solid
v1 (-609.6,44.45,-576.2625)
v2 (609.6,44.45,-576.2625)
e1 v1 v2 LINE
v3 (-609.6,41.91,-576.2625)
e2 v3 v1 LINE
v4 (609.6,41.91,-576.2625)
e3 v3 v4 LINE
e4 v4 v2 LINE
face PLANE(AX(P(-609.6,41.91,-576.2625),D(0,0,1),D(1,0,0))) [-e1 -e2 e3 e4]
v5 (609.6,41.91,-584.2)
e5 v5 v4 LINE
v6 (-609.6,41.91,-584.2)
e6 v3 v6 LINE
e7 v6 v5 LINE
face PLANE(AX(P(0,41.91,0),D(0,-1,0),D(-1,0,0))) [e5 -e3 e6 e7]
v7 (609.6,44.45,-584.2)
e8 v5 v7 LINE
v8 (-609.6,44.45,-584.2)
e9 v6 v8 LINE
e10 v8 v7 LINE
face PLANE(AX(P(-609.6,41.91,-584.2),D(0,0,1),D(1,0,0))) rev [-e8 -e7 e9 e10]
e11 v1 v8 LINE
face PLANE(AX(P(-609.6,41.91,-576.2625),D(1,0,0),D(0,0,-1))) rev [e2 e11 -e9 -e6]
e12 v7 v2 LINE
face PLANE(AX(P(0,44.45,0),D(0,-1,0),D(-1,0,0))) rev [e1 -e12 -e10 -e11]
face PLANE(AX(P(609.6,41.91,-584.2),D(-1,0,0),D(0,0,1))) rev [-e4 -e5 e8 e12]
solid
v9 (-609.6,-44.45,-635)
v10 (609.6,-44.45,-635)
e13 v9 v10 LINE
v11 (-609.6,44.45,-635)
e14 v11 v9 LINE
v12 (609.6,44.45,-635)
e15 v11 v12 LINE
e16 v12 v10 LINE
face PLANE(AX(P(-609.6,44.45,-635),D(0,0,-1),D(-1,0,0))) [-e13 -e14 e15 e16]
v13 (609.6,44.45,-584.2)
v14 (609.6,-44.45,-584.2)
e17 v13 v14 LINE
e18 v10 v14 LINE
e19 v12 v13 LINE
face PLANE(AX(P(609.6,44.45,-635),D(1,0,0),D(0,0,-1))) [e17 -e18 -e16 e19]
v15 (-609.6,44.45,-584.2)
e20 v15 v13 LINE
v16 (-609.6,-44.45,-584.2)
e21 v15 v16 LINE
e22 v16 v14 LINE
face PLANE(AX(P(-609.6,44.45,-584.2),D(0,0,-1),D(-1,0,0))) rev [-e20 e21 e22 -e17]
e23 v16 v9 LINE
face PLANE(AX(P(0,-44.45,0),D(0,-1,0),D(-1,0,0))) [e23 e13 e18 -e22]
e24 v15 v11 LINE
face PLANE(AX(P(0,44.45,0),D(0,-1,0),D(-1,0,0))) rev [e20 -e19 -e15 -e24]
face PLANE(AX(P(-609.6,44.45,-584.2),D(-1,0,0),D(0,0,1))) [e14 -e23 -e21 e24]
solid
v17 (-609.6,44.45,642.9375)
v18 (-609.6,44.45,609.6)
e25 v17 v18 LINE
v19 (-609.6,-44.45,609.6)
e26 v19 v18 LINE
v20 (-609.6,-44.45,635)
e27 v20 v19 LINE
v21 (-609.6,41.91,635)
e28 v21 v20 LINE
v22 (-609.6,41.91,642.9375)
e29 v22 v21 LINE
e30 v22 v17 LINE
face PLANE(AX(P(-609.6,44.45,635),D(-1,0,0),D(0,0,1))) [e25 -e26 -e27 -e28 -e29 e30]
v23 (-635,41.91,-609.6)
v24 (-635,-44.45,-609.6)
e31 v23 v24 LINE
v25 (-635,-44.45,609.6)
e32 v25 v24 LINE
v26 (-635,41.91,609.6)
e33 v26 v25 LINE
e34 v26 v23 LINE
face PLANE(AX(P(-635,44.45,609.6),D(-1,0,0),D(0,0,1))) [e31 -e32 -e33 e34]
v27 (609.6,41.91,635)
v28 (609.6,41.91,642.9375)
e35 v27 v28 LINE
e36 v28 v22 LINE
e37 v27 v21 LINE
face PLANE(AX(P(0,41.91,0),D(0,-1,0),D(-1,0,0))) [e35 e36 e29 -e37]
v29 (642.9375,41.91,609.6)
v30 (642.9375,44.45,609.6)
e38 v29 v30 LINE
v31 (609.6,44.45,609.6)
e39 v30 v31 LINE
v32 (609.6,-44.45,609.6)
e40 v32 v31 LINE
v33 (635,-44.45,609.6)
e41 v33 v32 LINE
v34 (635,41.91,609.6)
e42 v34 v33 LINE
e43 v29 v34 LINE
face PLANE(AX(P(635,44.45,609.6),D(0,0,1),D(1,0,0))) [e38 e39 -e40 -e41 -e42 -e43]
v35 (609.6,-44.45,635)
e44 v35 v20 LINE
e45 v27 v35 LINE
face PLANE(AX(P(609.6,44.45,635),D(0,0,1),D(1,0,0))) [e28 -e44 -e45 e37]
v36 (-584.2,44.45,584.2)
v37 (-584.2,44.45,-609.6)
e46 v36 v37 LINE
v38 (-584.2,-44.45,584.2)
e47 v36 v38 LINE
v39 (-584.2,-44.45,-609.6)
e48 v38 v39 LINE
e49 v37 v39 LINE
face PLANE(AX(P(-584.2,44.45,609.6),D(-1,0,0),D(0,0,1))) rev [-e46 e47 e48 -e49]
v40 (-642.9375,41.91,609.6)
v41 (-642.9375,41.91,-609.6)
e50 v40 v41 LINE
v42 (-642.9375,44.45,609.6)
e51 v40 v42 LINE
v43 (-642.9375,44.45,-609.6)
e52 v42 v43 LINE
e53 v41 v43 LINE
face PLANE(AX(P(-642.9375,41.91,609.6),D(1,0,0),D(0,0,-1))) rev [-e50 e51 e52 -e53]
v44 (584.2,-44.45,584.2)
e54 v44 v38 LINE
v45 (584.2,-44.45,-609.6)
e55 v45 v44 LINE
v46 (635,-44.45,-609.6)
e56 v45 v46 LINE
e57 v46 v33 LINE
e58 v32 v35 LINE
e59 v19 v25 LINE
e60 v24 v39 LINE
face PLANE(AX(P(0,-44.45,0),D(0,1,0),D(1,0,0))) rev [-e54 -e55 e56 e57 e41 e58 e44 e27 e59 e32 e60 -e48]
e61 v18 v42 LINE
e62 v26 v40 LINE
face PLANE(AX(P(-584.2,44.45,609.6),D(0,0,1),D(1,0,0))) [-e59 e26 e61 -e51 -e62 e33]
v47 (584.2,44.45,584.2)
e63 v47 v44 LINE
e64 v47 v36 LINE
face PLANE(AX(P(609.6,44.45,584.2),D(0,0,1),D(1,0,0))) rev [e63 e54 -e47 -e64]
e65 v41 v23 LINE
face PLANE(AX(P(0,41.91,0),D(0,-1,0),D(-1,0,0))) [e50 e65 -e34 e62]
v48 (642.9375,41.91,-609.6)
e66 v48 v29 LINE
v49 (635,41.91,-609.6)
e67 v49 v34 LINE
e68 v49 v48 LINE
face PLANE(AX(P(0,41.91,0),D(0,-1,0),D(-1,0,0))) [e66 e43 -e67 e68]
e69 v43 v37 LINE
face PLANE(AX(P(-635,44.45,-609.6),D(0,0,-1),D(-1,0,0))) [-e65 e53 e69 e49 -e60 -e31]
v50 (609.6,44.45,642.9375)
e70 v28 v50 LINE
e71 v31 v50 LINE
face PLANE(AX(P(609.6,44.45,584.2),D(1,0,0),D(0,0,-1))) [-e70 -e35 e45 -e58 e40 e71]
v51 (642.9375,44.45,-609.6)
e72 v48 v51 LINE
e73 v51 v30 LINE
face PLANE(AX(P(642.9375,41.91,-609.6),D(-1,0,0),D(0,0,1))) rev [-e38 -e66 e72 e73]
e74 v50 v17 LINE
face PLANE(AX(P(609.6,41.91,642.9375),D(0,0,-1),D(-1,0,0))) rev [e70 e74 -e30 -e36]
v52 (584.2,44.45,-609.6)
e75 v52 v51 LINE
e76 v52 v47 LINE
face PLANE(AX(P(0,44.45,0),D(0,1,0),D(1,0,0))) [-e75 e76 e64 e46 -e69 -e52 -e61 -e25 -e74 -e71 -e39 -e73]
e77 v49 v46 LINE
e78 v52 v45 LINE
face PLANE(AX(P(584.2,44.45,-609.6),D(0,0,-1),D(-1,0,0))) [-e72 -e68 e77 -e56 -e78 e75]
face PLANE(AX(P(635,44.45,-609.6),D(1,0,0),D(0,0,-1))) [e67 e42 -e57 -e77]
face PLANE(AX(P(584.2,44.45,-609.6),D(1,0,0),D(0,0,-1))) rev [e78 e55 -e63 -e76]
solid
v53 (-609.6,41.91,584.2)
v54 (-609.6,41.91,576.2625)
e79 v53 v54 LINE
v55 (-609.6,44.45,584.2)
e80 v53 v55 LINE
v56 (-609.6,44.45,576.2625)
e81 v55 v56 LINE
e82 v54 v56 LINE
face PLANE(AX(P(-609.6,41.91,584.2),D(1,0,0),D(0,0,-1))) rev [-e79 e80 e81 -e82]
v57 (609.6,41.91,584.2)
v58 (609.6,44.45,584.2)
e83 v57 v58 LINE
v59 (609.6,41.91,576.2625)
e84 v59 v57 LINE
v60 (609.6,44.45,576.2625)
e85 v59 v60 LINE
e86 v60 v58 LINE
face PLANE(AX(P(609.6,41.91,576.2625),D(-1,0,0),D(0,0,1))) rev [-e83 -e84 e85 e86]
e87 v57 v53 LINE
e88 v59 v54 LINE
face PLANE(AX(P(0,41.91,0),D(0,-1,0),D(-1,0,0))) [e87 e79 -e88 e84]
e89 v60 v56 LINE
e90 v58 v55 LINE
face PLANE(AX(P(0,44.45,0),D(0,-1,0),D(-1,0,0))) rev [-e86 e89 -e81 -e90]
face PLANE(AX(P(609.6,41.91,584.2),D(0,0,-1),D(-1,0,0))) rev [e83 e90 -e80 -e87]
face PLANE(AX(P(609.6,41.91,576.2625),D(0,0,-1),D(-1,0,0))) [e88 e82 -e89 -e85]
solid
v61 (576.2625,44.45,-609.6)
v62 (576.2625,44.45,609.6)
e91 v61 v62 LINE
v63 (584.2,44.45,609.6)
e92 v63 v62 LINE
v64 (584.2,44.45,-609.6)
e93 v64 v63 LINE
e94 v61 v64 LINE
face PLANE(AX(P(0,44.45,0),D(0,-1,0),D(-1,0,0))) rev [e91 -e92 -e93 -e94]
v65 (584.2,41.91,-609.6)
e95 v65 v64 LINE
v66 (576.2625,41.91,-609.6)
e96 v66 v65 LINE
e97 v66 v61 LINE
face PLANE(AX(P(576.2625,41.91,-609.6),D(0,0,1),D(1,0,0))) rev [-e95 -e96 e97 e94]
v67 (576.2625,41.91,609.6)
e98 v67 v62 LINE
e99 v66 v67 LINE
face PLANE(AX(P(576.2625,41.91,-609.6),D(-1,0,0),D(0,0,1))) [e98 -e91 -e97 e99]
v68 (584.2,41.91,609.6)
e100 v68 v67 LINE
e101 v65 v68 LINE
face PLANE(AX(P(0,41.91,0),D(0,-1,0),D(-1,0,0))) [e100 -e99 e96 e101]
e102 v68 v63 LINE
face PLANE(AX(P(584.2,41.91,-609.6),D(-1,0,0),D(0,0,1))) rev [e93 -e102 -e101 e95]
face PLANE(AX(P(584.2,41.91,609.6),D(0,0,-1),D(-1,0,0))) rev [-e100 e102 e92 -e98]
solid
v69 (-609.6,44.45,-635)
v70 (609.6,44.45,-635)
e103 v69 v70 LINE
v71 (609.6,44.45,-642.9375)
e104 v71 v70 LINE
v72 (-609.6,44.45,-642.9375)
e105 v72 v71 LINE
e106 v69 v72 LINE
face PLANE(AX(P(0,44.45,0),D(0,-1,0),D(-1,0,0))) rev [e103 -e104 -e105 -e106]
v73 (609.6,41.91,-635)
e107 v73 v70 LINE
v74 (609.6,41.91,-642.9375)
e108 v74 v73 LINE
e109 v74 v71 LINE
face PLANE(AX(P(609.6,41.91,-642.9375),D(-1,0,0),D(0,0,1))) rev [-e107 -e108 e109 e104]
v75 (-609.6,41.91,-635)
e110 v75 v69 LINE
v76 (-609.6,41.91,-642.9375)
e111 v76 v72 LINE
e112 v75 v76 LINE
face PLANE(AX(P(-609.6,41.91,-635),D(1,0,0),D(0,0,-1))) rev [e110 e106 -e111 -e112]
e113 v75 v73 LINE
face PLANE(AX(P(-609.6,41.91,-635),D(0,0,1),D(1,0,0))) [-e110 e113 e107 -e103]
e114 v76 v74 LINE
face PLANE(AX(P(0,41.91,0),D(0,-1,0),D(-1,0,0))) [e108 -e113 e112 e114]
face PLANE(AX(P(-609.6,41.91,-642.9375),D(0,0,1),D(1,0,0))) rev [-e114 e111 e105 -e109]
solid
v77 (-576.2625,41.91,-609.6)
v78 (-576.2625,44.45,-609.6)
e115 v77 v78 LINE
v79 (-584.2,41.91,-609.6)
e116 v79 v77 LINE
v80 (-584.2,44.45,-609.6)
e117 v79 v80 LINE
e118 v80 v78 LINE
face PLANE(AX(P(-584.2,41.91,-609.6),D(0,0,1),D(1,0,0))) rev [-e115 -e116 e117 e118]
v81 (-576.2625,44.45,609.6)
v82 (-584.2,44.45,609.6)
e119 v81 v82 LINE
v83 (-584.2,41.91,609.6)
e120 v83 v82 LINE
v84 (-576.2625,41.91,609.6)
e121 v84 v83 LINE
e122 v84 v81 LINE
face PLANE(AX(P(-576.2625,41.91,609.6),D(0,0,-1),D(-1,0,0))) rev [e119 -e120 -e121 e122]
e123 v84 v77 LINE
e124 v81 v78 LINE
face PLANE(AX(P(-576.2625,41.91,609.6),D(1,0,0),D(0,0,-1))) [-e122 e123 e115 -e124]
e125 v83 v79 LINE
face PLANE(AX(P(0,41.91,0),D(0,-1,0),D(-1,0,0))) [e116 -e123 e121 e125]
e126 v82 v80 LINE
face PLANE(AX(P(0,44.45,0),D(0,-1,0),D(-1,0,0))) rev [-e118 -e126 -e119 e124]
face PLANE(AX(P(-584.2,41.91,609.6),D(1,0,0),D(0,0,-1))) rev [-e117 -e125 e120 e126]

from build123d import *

# Parameters (mm, degrees)
FIXTURE_START       = -44.45
FIXTURE_OUTLINE_W   = 1219.2
FIXTURE_OUTLINE_H   = 50.8
FIXTURE_DEPTH       = 88.9
FIXTURE_2_OUTLINE_W = 50.8
FIXTURE_2_OUTLINE_H = 1219.2
FIXTURE_2_DEPTH     = 88.9
FIXTURE_3_OUTLINE_W = 50.8
FIXTURE_3_OUTLINE_H = 1219.2
FIXTURE_3_DEPTH     = 88.9
FIXTURE_4_OUTLINE_W = 1219.2
FIXTURE_4_OUTLINE_H = 50.8
FIXTURE_4_DEPTH     = 88.9
OUTERFLANGE_START   = 44.45
SKETCH13_W          = 7.9375
SKETCH13_H          = 1219.2
SKETCH13_W_2        = 1219.2
SKETCH13_H_2        = 7.9375
OUTERFLANGE_DEPTH   = 2.54
INNERFLANGE_START   = 44.45
SKETCH14_W          = 7.9375
SKETCH14_H          = 1219.2
INNERFLANGE_DEPTH   = 2.54
SKETCH14_W_2        = 1219.2
SKETCH14_H_2        = 7.9375
INNERFLANGE_2_DEPTH = 2.54
INNERFLANGE_3_DEPTH = 2.54
INNERFLANGE_4_DEPTH = 2.54


with BuildPart() as part:
    # Fixture: read off the stored shape, not the designer's step
    # Fixture outline → Fixture (new body)
    with BuildSketch(Plane(origin=(0, 0, 0), x_dir=(1, 0, 0), z_dir=(0, 1, 0)).offset(FIXTURE_START)):
        with Locations((0, 609.6)):
            Rectangle(FIXTURE_OUTLINE_W, FIXTURE_OUTLINE_H)
    extrude(amount=FIXTURE_DEPTH)


with BuildPart() as body_2:
    # Fixture 2 outline → Fixture 2 (new body)
    with BuildSketch(Plane(origin=(0, 0, 0), x_dir=(1, 0, 0), z_dir=(0, 1, 0)).offset(FIXTURE_START)):
        with Locations((609.6, 0)):
            Rectangle(FIXTURE_2_OUTLINE_W, FIXTURE_2_OUTLINE_H)
    extrude(amount=FIXTURE_2_DEPTH)



with BuildPart() as body_3:
    # Fixture 3 outline → Fixture 3 (new body)
    with BuildSketch(Plane(origin=(0, 0, 0), x_dir=(1, 0, 0), z_dir=(0, 1, 0)).offset(FIXTURE_START)):
        with Locations((-609.6, 0)):
            Rectangle(FIXTURE_3_OUTLINE_W, FIXTURE_3_OUTLINE_H)
    extrude(amount=FIXTURE_3_DEPTH)


with BuildPart() as body_4:
    # Fixture 4 outline → Fixture 4 (new body)
    with BuildSketch(Plane(origin=(0, 0, 0), x_dir=(1, 0, 0), z_dir=(0, 1, 0)).offset(FIXTURE_START)):
        with Locations((0, -609.6)):
            Rectangle(FIXTURE_4_OUTLINE_W, FIXTURE_4_OUTLINE_H)
    extrude(amount=FIXTURE_4_DEPTH)


with BuildPart() as body_2_1:
    add(body_2.part)

    add(body_3.part)  # OuterFlange merges body 3

    add(body_4.part)  # OuterFlange merges body 4
    # Sketch13 → OuterFlange (add)
    with BuildSketch(Plane(origin=(0, 0, 0), x_dir=(1, 0, 0), z_dir=(0, 1, 0)).offset(OUTERFLANGE_START)):
        with Locations((638.96875, 0)):
            Rectangle(SKETCH13_W, SKETCH13_H)
        with Locations((0, -638.96875)):
            Rectangle(SKETCH13_W_2, SKETCH13_H_2)
        with Locations((-638.96875, 0)):
            Rectangle(SKETCH13_W, SKETCH13_H)
        with Locations((0, 638.96875)):
            Rectangle(SKETCH13_W_2, SKETCH13_H_2)
    extrude(amount=-OUTERFLANGE_DEPTH)


with BuildPart() as body_3_2:
    # Sketch14 → InnerFlange (new body)
    with BuildSketch(Plane(origin=(0, 0, 0), x_dir=(1, 0, 0), z_dir=(0, 1, 0)).offset(INNERFLANGE_START)):
        with Locations((580.23125, 0)):
            Rectangle(SKETCH14_W, SKETCH14_H)
    extrude(amount=-INNERFLANGE_DEPTH)


with BuildPart() as body_4_2:
    # Sketch14 → InnerFlange 2 (new body)
    with BuildSketch(Plane(origin=(0, 0, 0), x_dir=(1, 0, 0), z_dir=(0, 1, 0)).offset(INNERFLANGE_START)):
        with Locations((0, -580.23125)):
            Rectangle(SKETCH14_W_2, SKETCH14_H_2)
    extrude(amount=-INNERFLANGE_2_DEPTH)


with BuildPart() as body_5:
    # Sketch14 → InnerFlange 3 (new body)
    with BuildSketch(Plane(origin=(0, 0, 0), x_dir=(1, 0, 0), z_dir=(0, 1, 0)).offset(INNERFLANGE_START)):
        with Locations((-580.23125, 0)):
            Rectangle(SKETCH14_W, SKETCH14_H)
    extrude(amount=-INNERFLANGE_3_DEPTH)


with BuildPart() as body_6:
    # Sketch14 → InnerFlange 4 (new body)
    with BuildSketch(Plane(origin=(0, 0, 0), x_dir=(1, 0, 0), z_dir=(0, 1, 0)).offset(INNERFLANGE_START)):
        with Locations((0, 580.23125)):
            Rectangle(SKETCH14_W_2, SKETCH14_H_2)
    extrude(amount=-INNERFLANGE_4_DEPTH)


solid = Compound([part.part, body_2_1.part, body_3_2.part, body_4_2.part, body_5.part, body_6.part])
